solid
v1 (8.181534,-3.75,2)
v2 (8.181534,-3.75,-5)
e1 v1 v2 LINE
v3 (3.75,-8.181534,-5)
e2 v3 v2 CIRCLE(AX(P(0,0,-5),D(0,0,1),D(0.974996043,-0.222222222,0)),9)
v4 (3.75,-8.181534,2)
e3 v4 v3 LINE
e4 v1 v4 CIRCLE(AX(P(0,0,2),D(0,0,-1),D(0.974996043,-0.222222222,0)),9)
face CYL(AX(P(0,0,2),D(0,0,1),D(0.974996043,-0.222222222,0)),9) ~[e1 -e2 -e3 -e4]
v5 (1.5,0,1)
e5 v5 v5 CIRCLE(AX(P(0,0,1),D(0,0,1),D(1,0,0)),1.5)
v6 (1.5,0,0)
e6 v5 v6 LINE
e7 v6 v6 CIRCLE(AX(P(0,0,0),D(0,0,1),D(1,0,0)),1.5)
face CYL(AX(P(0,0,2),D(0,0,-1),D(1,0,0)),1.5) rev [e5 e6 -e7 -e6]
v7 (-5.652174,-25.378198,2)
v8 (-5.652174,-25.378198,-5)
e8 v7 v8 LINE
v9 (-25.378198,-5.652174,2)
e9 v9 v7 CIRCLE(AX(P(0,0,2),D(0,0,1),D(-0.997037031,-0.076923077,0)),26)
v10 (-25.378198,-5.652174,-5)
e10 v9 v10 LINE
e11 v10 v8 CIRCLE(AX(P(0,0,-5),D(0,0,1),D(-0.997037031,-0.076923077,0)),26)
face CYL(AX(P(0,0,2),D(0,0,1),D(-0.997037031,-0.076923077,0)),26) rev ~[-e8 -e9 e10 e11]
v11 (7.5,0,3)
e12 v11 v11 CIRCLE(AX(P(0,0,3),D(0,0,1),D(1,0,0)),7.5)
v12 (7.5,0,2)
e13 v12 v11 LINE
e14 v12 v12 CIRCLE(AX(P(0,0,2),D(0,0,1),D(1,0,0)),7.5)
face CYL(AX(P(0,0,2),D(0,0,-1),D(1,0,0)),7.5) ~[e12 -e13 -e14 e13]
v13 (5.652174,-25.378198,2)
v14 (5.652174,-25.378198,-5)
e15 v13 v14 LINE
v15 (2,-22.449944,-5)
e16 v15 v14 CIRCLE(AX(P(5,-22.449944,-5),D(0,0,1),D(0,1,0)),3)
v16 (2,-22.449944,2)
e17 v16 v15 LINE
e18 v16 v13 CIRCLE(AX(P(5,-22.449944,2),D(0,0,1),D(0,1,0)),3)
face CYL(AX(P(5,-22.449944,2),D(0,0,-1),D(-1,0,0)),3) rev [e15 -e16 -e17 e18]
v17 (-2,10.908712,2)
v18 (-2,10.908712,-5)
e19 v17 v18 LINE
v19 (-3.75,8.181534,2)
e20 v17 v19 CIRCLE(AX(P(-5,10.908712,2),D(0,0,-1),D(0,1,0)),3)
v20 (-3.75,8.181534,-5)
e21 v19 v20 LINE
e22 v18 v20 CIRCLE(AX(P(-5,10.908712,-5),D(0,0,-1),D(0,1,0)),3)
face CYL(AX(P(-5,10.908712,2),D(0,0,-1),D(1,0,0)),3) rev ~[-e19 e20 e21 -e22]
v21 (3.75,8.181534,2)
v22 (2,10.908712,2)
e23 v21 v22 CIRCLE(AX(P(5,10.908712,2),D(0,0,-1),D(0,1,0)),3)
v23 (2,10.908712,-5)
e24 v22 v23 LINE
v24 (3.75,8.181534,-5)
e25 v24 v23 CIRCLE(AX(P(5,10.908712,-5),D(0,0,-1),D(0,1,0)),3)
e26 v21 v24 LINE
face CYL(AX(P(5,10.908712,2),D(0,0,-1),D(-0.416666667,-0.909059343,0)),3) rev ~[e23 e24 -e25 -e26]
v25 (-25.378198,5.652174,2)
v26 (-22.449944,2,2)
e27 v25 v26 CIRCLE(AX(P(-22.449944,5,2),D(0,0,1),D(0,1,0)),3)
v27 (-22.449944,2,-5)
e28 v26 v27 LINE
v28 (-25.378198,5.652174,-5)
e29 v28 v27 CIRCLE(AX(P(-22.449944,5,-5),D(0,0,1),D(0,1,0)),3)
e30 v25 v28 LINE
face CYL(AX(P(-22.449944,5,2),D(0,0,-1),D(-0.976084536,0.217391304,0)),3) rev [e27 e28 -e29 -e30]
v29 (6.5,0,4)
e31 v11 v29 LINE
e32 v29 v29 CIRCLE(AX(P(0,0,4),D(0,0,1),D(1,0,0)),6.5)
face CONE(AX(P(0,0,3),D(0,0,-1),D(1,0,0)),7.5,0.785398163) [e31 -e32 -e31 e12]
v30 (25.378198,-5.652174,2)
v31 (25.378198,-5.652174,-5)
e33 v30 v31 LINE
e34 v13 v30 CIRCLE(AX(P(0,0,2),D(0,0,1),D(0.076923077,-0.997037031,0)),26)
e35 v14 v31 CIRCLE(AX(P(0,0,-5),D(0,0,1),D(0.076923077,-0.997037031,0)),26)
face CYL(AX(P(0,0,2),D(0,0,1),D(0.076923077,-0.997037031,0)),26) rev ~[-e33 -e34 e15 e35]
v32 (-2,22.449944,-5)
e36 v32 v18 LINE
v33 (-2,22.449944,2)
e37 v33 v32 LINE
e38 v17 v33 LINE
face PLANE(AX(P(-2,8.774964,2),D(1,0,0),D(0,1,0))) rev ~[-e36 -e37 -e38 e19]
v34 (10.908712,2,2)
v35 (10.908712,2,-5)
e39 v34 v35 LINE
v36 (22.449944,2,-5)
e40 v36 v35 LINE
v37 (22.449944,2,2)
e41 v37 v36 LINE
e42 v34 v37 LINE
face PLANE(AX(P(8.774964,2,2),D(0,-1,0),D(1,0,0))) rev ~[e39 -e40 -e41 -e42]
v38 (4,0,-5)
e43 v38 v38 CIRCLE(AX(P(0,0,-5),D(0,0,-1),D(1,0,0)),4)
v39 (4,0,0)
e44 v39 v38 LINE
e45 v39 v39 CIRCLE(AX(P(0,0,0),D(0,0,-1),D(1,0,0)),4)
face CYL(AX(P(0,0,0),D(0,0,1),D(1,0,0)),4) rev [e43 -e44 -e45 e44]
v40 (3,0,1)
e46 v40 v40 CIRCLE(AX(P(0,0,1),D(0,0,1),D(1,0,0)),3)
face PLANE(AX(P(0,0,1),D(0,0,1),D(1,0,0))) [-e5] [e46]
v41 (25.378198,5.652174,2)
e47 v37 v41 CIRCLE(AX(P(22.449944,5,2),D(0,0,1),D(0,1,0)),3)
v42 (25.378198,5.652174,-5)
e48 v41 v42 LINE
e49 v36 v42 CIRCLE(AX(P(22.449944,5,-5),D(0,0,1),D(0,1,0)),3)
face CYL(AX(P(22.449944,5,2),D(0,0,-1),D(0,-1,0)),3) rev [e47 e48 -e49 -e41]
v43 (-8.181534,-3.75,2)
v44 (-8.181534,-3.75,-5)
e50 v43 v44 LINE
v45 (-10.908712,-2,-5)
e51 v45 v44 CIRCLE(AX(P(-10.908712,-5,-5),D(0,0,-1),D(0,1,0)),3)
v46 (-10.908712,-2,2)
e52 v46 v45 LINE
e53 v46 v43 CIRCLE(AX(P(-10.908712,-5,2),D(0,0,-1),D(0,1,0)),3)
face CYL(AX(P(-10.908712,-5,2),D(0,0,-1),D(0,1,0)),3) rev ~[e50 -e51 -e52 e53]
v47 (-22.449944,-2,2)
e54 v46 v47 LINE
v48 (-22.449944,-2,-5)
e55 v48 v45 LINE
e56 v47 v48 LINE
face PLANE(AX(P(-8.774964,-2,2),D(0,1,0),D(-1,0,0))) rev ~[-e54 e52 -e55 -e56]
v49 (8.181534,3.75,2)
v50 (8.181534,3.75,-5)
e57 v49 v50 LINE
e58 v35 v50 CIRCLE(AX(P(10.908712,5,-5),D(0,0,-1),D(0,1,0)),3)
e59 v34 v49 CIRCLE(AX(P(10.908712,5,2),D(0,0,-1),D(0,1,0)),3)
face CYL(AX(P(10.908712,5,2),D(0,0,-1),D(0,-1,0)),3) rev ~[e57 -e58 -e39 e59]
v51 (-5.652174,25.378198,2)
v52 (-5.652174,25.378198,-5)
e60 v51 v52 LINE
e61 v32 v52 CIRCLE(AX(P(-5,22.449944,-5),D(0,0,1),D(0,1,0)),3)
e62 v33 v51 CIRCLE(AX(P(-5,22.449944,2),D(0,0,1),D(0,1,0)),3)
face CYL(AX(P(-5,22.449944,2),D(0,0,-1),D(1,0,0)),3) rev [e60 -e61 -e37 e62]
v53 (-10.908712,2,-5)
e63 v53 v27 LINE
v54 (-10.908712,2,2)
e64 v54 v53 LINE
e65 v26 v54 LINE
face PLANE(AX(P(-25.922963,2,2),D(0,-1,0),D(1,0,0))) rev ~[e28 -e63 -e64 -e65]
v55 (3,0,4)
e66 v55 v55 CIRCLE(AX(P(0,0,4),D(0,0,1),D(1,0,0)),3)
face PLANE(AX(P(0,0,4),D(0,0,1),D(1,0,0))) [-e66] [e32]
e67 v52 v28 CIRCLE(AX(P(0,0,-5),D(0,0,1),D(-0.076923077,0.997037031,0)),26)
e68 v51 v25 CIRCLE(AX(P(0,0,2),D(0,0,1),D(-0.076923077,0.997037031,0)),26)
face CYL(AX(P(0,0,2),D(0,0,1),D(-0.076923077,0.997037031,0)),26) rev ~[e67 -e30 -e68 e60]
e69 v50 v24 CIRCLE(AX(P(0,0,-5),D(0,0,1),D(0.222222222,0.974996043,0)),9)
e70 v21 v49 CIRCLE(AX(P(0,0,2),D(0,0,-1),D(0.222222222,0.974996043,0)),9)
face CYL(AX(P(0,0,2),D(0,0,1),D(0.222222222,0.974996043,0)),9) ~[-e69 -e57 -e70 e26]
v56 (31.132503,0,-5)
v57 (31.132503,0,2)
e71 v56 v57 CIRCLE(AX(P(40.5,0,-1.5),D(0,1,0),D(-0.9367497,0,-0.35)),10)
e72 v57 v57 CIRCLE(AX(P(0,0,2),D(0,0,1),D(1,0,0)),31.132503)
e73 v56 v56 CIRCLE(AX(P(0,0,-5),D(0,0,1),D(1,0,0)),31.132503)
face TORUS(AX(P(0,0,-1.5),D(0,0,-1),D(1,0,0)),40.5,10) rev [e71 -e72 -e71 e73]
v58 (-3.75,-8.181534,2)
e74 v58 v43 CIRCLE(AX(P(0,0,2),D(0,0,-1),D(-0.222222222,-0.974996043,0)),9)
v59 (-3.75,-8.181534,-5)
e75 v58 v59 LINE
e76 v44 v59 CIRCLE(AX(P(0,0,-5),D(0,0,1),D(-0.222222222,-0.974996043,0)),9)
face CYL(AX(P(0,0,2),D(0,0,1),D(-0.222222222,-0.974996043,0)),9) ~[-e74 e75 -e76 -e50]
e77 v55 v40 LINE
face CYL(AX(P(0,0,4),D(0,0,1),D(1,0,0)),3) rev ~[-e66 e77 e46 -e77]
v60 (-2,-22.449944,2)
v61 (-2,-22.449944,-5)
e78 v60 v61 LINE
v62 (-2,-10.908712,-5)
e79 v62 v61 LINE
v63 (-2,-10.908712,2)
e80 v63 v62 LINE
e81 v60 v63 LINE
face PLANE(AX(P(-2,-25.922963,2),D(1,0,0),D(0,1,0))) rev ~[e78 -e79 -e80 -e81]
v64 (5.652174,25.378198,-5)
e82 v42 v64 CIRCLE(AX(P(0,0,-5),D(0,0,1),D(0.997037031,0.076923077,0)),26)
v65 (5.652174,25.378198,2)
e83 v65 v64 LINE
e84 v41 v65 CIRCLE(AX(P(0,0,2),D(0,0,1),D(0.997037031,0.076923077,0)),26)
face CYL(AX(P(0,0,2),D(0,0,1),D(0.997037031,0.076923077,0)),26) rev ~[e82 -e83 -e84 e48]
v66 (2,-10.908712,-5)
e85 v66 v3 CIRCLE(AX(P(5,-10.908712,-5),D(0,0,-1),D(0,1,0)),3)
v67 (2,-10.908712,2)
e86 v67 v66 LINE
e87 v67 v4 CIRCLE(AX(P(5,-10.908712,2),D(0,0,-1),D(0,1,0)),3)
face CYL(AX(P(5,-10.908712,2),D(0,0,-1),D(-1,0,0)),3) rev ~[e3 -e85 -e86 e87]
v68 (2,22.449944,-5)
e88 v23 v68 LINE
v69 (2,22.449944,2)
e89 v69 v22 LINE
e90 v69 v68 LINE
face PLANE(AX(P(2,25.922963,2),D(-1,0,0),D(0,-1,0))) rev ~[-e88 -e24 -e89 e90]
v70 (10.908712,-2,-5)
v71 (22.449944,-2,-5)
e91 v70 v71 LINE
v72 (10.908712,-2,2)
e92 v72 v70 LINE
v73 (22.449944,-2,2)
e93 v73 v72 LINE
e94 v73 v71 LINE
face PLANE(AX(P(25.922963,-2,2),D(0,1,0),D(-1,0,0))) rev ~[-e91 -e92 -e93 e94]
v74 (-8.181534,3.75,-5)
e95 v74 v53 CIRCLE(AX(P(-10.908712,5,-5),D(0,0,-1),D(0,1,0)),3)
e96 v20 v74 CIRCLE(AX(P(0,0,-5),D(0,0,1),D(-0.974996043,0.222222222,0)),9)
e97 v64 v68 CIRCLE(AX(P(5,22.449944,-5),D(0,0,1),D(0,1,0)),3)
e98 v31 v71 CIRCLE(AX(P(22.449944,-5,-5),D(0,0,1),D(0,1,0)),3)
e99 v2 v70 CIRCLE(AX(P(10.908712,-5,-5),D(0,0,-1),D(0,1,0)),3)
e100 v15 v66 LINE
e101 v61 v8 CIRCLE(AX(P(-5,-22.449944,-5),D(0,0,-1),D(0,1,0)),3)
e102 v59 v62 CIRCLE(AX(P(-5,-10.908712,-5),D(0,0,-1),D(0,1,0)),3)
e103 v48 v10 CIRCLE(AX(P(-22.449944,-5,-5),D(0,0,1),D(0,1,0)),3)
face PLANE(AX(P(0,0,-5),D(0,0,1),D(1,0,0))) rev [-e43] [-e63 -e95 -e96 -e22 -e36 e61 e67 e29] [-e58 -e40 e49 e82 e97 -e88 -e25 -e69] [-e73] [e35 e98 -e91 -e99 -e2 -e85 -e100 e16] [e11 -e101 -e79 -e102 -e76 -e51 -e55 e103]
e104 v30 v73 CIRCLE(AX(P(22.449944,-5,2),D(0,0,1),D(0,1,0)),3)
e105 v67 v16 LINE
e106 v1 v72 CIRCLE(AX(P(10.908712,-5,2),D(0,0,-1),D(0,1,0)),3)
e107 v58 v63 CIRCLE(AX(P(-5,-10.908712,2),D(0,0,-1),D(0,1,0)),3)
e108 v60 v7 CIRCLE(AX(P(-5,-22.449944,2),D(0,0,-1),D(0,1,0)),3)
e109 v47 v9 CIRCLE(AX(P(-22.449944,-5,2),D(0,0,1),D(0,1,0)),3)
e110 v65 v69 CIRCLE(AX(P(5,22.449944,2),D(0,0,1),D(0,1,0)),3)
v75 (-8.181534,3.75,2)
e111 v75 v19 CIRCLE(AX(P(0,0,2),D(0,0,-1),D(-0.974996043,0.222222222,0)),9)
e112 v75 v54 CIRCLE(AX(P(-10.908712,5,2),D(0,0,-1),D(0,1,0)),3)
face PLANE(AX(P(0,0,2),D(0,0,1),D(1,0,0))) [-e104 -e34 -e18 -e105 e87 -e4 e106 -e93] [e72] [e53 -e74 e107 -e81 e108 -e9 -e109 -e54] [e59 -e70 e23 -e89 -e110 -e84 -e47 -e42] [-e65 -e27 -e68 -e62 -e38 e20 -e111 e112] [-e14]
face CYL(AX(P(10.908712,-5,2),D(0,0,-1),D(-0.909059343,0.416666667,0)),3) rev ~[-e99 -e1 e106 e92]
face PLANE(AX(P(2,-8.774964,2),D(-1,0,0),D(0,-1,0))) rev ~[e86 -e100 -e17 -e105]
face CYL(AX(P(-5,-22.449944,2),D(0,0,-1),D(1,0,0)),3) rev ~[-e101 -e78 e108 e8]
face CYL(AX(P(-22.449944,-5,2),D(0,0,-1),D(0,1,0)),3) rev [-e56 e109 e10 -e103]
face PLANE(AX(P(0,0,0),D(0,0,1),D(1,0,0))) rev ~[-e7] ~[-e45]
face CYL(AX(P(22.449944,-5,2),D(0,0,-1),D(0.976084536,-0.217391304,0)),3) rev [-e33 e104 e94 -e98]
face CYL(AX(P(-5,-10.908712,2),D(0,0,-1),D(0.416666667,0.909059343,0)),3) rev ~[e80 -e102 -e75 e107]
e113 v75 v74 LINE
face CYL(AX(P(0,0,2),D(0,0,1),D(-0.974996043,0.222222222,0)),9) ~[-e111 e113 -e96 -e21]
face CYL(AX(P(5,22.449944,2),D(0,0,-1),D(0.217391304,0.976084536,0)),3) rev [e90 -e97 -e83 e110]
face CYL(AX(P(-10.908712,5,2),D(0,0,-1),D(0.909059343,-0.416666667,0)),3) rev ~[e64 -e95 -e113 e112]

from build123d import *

# Parameters (mm, degrees)
F0_R             = 30
F0_R_2           = 1.5
F1_DEPTH         = 2
F2_R             = 7.5
F2_R_2           = 1.5
F3_DEPTH         = 2
F4_R             = 3
F4_R_2           = 1.5
F5_DEPTH         = 3
F6_SIZE          = 1
F7_R             = 30
F7_R_2           = 4
F8_DEPTH         = 5
F10_DEPTH        = 25
F10_COPIES_COUNT = 4
F11_R            = 3


# Not quite as in the source:
# - a pattern or mirror of a feature is missing from the dataset's text; its kind, count and spacing are read off the source's solid


with BuildPart() as f1:
    # F0 (on Top) → F1 (new body)
    with BuildSketch(Plane.XY):
        Circle(F0_R)
        Circle(F0_R_2, mode=Mode.SUBTRACT)
    extrude(amount=F1_DEPTH)

    # F2 (on face) → F3 (join)
    with BuildSketch(Plane.XY.offset(2)):
        Circle(F2_R)
        Circle(F2_R_2, mode=Mode.SUBTRACT)
    extrude(amount=F3_DEPTH)

    # F4 (on face) → F5 (cut)
    with BuildSketch(Plane.XY.offset(4)):
        Circle(F4_R)
        Circle(F4_R_2, mode=Mode.SUBTRACT)
    extrude(amount=-F5_DEPTH, mode=Mode.SUBTRACT)

    # F6
    f6_edges = [f1.edges().sort_by_distance(p)[0] for p in [
        (-7.5, 0, 4),
    ]]
    chamfer(f6_edges, length=F6_SIZE)

    # F7 (on face) → F8 (join)
    with BuildSketch(Plane(origin=(0, 0, 0), x_dir=(1, 0, 0), z_dir=(0, 0, -1))):
        Circle(F7_R)
        Circle(F7_R_2, mode=Mode.SUBTRACT)
    extrude(amount=F8_DEPTH)

    # F9 (on face) → F10 (cut)
    with BuildSketch(Plane.XY.offset(2)):
        with BuildLine():
            Line((2, -8.7749643874), (2, -25.9229627936))
            ThreePointArc((2, -25.9229627936), (18.3847763109, -18.3847763109), (25.9229627936, -2))
            Line((25.9229627936, -2), (8.7749643874, -2))
            ThreePointArc((8.7749643874, -2), (6.3639610307, -6.3639610307), (2, -8.7749643874))
        make_face()
    f10 = extrude(amount=-F10_DEPTH, mode=Mode.SUBTRACT)

    # F10_copies: F10 ×4 about axis
    f10_copies_axis = Axis((0, 0, 0), (0, 0, 1))
    for i in range(1, F10_COPIES_COUNT):
        add(f10.rotate(f10_copies_axis, i * 360 / F10_COPIES_COUNT), mode=Mode.SUBTRACT)

    # F11
    f11_edges = [f1.edges().sort_by_distance(p)[0] for p in [
        (8.774964, -2, -1.5),
        (2, -25.922963, -1.5),
        (25.922963, -2, -1.5),
        (2, -8.774964, -1.5),
        (-2, -8.774964, -1.5),
        (-2, -25.922963, -1.5),
        (-8.774964, -2, -1.5),
        (-25.922963, -2, -1.5),
        (-8.774964, 2, -1.5),
        (-25.922963, 2, -1.5),
        (-2, 25.922963, -1.5),
        (-2, 8.774964, -1.5),
        (2, 8.774964, -1.5),
        (2, 25.922963, -1.5),
        (25.922963, 2, -1.5),
        (8.774964, 2, -1.5),
    ]]
    fillet(f11_edges, radius=F11_R)

    # F12 (on Front) → F13 (revolve)
    with BuildSketch(Plane.XZ):
        with BuildLine():
            Line((31.1325030024, 2), (30, 2))
            Line((30, 2), (30, -5))
            Line((30, -5), (31.1325030024, -5))
            ThreePointArc((31.1325030024, -5), (30.5, -1.5), (31.1325030024, 2))
        make_face()
    revolve(axis=Axis((0, 0, 4), (0, 0, 1)))


solid = f1.part
